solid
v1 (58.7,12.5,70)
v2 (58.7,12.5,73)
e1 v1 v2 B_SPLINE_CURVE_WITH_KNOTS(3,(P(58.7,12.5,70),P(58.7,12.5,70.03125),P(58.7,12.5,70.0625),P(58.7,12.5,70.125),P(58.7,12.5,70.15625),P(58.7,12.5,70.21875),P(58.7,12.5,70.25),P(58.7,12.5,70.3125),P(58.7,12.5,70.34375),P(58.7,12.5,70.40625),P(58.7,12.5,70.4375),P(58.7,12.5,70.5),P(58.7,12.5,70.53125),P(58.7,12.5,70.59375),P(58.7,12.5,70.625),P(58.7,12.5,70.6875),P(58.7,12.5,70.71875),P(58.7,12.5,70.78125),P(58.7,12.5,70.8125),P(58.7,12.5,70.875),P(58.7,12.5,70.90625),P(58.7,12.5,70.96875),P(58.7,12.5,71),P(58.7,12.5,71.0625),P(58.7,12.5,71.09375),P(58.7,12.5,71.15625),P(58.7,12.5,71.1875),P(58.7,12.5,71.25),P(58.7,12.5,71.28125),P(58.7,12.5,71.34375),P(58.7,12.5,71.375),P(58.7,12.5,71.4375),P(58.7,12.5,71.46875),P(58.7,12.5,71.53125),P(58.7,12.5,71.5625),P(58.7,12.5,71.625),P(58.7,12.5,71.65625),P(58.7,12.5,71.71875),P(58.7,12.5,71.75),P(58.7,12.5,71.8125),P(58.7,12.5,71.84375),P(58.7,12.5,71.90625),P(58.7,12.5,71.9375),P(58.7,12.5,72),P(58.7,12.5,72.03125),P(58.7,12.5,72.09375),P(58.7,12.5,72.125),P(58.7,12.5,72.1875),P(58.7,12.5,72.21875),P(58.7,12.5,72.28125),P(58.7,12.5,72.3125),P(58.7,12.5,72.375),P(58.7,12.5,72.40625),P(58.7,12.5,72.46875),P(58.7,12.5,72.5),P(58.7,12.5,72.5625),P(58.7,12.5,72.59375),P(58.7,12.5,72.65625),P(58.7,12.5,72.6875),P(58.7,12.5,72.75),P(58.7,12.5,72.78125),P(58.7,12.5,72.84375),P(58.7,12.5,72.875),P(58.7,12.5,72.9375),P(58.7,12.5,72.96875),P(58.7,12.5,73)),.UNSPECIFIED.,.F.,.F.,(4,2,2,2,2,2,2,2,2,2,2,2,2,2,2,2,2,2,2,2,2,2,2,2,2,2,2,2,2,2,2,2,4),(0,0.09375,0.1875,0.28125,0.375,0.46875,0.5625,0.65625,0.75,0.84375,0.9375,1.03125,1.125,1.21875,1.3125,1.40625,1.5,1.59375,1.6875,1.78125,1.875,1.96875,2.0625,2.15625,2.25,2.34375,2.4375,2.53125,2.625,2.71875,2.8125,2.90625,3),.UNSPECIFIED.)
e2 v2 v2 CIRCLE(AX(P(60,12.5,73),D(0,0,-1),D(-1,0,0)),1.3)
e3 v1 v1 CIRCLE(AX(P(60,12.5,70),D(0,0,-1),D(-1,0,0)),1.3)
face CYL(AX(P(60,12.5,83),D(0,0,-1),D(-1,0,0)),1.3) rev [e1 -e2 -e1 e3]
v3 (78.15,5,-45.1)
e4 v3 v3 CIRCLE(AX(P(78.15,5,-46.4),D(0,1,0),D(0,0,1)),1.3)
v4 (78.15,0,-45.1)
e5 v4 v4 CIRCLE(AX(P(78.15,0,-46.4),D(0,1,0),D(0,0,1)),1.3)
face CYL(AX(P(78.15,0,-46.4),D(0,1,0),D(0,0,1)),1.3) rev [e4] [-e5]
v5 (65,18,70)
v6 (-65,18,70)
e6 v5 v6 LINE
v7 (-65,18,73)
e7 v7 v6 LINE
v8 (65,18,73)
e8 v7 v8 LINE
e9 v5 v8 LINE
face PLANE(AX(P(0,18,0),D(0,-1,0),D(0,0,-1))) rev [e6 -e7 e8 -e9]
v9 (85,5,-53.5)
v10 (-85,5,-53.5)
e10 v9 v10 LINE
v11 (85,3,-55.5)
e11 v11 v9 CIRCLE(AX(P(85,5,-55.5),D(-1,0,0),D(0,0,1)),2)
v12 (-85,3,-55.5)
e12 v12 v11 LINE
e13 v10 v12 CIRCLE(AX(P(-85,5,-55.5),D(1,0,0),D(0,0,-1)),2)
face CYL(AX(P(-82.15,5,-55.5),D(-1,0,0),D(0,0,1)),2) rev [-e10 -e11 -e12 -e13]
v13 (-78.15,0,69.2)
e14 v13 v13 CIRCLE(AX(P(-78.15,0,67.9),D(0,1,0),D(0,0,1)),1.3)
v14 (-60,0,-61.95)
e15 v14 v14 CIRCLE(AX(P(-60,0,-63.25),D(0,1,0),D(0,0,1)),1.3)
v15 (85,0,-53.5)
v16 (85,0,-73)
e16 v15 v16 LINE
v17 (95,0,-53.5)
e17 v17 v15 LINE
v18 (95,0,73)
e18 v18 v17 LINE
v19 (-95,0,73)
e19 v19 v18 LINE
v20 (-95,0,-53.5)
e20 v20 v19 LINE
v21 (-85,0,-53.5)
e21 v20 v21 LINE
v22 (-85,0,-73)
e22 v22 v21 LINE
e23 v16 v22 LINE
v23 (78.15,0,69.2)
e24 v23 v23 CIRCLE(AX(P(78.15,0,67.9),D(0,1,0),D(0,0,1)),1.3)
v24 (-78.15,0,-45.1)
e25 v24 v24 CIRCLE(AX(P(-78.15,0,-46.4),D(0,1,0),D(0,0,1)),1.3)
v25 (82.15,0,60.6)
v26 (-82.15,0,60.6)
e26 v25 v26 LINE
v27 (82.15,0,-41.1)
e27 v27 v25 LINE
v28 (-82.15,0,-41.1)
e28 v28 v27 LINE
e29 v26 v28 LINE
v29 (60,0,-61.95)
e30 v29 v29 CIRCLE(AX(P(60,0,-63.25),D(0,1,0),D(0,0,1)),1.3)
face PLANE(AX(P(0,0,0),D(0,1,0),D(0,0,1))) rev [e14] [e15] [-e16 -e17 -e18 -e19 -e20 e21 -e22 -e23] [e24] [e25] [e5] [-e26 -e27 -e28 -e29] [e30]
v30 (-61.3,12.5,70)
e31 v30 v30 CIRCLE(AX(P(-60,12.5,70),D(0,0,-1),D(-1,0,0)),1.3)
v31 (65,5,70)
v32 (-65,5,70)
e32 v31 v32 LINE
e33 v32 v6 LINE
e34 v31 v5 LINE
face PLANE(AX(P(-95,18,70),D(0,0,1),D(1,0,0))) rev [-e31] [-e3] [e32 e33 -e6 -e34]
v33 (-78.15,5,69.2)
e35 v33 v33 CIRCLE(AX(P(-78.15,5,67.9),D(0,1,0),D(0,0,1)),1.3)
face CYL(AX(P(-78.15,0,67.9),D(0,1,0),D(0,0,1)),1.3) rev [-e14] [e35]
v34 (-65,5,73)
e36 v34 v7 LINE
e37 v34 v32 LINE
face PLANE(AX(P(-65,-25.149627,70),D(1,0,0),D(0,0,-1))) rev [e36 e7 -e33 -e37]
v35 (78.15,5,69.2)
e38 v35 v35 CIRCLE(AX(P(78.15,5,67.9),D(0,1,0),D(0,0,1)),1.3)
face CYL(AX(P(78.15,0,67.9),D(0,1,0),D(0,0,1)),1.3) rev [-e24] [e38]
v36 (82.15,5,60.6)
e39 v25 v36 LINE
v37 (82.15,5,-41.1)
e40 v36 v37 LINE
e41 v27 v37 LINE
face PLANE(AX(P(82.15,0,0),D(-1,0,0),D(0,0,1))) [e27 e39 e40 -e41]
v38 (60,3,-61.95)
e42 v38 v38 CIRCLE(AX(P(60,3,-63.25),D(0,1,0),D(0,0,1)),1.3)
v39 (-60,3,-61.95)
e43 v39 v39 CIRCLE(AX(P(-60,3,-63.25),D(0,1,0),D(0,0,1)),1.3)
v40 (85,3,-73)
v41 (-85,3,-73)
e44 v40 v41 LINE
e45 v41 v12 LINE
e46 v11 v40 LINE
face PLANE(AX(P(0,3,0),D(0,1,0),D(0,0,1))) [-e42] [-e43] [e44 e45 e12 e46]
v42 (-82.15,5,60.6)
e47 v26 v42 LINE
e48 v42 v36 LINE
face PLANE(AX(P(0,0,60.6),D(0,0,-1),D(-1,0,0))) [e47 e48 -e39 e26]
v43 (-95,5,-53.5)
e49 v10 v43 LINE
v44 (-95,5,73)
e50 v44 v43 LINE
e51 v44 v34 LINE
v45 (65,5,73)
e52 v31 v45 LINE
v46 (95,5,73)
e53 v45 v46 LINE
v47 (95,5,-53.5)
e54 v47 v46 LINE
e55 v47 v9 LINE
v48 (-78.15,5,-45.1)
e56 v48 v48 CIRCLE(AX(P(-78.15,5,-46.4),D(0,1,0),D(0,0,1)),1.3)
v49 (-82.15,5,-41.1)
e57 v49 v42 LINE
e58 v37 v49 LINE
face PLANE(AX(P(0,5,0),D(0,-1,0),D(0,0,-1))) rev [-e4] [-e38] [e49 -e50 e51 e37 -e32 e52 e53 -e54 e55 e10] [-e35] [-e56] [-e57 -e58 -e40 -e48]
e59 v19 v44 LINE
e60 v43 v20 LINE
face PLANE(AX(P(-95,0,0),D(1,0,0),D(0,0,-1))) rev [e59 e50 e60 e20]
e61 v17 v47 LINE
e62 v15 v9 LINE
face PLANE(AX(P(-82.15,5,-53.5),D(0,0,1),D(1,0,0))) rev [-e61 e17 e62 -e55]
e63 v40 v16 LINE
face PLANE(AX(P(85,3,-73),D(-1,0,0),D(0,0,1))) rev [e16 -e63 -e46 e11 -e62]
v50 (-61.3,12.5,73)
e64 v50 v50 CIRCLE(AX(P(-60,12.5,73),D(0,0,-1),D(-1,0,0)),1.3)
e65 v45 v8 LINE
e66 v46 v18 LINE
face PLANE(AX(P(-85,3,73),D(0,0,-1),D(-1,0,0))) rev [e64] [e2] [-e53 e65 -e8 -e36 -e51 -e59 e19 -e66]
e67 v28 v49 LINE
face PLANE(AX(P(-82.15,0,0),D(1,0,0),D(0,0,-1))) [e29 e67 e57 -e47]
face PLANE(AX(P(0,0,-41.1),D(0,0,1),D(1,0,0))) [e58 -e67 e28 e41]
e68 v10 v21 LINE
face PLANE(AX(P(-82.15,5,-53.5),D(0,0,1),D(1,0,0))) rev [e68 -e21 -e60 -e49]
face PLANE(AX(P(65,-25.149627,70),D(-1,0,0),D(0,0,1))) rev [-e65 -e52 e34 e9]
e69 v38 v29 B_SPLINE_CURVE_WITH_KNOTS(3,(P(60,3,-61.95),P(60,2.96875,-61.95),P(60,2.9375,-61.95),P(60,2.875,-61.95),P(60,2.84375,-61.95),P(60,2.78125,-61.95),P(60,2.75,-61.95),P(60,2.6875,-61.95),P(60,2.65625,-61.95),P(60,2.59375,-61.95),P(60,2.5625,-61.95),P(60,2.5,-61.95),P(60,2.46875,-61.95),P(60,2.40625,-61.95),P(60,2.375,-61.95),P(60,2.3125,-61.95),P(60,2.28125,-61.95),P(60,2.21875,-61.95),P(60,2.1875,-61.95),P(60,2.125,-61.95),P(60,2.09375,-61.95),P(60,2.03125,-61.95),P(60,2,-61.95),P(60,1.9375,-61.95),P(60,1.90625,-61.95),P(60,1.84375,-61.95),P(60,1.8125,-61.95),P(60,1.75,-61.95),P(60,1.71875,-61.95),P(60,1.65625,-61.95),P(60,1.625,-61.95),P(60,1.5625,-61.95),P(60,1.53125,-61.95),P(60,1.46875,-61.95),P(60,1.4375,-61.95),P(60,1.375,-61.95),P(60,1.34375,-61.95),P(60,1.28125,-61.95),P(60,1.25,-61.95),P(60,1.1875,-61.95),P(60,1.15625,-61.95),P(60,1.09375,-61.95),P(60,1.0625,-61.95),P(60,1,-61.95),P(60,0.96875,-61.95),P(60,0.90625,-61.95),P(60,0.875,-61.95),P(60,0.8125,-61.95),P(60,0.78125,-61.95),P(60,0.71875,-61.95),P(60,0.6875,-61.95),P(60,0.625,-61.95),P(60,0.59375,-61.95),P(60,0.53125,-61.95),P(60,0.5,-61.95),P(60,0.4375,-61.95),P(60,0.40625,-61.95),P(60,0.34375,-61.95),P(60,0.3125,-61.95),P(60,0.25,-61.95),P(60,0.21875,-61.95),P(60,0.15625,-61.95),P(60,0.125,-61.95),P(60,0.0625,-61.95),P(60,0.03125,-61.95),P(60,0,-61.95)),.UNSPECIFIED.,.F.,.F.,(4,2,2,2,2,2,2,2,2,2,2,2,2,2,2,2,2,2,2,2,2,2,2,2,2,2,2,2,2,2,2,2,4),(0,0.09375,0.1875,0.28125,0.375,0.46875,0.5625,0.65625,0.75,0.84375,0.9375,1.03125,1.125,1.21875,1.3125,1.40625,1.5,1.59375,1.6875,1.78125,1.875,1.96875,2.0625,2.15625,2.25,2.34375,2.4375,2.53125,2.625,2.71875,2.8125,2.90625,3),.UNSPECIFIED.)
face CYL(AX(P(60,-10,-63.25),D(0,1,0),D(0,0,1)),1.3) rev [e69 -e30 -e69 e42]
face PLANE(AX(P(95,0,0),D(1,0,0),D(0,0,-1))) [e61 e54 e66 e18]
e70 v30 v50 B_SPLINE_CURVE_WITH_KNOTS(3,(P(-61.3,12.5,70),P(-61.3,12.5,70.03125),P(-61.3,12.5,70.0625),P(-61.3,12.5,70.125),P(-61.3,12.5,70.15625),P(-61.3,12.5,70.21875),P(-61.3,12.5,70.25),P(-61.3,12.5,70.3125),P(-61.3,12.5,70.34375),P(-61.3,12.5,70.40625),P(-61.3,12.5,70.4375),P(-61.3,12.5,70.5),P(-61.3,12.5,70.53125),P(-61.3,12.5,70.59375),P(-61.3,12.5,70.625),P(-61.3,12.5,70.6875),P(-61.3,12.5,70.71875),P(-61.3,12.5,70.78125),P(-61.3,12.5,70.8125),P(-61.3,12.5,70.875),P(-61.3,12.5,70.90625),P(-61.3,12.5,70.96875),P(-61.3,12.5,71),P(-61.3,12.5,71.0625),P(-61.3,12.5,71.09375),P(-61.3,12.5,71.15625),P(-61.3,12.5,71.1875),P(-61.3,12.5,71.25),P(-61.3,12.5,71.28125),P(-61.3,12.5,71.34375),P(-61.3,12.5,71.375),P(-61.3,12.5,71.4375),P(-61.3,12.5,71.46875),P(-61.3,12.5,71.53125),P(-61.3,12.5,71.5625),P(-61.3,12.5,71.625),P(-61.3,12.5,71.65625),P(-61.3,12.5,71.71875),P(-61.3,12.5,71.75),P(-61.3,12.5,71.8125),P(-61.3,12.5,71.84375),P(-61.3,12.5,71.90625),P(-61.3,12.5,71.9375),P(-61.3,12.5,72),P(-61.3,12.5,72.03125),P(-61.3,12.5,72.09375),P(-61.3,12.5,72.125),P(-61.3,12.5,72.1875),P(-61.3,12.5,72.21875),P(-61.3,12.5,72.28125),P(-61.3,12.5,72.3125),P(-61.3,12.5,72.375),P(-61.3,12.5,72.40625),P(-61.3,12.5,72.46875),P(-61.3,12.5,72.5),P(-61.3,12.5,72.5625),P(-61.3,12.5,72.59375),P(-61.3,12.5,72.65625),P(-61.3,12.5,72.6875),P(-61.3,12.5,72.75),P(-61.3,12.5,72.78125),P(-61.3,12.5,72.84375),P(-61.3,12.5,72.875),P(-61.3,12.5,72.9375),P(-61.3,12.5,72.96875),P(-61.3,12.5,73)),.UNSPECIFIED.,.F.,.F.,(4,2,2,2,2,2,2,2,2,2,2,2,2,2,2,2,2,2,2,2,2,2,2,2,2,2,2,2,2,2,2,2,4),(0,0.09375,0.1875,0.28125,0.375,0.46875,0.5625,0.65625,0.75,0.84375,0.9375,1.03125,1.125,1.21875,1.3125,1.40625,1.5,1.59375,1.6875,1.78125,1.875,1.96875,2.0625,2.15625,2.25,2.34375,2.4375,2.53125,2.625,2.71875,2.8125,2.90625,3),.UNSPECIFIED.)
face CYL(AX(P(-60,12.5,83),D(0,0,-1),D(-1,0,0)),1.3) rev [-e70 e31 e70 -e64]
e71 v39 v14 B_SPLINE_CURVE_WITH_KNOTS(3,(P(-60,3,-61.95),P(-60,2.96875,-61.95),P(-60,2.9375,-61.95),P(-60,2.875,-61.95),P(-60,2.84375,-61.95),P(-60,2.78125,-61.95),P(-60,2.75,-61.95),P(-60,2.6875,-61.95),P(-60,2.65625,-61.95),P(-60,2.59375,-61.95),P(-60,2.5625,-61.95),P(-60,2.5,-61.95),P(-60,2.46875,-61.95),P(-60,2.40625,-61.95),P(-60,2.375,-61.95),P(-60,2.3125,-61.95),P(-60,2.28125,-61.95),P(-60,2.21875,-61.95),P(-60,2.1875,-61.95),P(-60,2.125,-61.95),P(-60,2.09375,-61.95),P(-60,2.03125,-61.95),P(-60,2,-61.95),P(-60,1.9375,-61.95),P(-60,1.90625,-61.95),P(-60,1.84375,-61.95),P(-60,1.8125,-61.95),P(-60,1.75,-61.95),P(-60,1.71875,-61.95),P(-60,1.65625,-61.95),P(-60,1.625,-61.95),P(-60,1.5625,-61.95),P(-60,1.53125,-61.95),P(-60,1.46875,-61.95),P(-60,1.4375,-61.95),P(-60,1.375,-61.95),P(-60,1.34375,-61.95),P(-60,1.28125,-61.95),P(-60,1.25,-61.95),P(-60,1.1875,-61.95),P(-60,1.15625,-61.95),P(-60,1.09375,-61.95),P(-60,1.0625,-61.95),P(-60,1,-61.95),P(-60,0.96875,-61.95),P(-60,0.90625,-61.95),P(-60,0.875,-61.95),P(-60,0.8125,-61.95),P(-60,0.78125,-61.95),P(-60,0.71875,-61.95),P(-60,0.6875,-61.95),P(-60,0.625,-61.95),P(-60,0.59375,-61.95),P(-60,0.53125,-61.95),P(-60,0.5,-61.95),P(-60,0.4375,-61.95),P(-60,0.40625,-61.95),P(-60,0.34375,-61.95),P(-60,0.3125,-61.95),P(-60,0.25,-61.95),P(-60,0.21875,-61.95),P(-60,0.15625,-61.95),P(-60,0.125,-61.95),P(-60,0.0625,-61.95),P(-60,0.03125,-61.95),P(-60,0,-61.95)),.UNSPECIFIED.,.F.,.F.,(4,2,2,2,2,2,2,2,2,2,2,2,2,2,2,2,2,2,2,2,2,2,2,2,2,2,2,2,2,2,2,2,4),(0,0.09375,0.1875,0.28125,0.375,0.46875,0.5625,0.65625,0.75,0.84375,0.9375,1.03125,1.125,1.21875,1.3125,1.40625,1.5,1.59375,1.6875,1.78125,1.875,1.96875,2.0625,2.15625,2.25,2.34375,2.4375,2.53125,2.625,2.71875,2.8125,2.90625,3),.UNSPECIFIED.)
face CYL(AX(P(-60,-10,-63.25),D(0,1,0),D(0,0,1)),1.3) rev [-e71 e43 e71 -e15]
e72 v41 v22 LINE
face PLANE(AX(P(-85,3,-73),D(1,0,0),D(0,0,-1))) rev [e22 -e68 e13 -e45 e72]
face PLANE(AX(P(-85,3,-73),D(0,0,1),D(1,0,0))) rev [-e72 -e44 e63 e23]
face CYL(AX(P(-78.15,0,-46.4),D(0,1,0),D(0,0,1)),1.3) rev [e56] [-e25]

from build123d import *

# Parameters (mm, degrees)
SKETCH1_W           = 170
SKETCH1_H           = 146
BOSS_EXTRUDE1_DEPTH = 3
SKETCH2_R           = 1.3
CUT_EXTRUDE1_DEPTH  = 3
CUT_EXTRUDE2_DEPTH  = 3
BOSS_EXTRUDE2_START = 2
SKETCH4_R           = 1.3
SKETCH4_W           = 164.3
SKETCH4_H           = 101.7
BOSS_EXTRUDE2_DEPTH = 2
BOSS_EXTRUDE5_DEPTH = 10
SKETCH10_W          = 126.5
SKETCH10_H          = 5
BOSS_EXTRUDE6_DEPTH = 10
SKETCH12_W          = 190
SKETCH12_H          = 3
BOSS_EXTRUDE8_DEPTH = 13
SKETCH13_R          = 1.3
CUT_EXTRUDE3_DEPTH  = 13
FILLET4_R           = 2
SKETCH14_R          = 1.3
CUT_EXTRUDE4_DEPTH  = 13
SKETCH15_W          = 30
SKETCH15_H          = 3
CUT_EXTRUDE5_DEPTH  = 13


with BuildPart() as part:
    # Sketch1 → Boss-Extrude1 (new body)
    with BuildSketch(Plane(origin=(0, 0, 0), x_dir=(1, 0, 0), z_dir=(0, 1, 0))):
        Rectangle(SKETCH1_W, SKETCH1_H)
    extrude(amount=BOSS_EXTRUDE1_DEPTH)

    # Sketch2 → Cut-Extrude1 (cut)
    with BuildSketch(Plane(origin=(0, 3, 0), x_dir=(1, 0, 0), z_dir=(0, 1, 0))):
        with Locations(Location((78.15, -67.9, 0), (0, 0, 270))):
            Circle(SKETCH2_R)
        with Locations(Location((-78.15, 46.4, 0), (0, 0, 270))):
            Circle(SKETCH2_R)
        with Locations(Location((-78.15, -67.9, 0), (0, 0, 270))):
            Circle(SKETCH2_R)
        with Locations(Location((78.15, 46.4, 0), (0, 0, 270))):
            Circle(SKETCH2_R)
    extrude(amount=-CUT_EXTRUDE1_DEPTH, mode=Mode.SUBTRACT)

    # Sketch3 → Cut-Extrude2 (cut)
    with BuildSketch(Plane(origin=(0, 3, 0), x_dir=(1, 0, 0), z_dir=(0, 1, 0))):
        Polygon((-78.15, -60.6), (-82.15, -60.6), (-82.15, 41.1), (-78.15, 41.1), (78.15, 41.1), (82.15, 41.1), (82.15, -60.6), (78.15, -60.6), align=None)
    extrude(amount=-CUT_EXTRUDE2_DEPTH, mode=Mode.SUBTRACT)

    # Sketch4 → Boss-Extrude2 (add)
    with BuildSketch(Plane(origin=(0, 3, 0), x_dir=(1, 0, 0), z_dir=(0, 1, 0)).offset(BOSS_EXTRUDE2_START)):
        Polygon((-82.15, 53.5), (85, 53.5), (85, -73), (-85, -73), (-85, 53.5), align=None)
        with Locations(Location((-78.15, 46.4, 0), (0, 0, 270))):
            Circle(SKETCH4_R, mode=Mode.SUBTRACT)
        with Locations(Location((-78.15, -67.9, 0), (0, 0, 270))):
            Circle(SKETCH4_R, mode=Mode.SUBTRACT)
        with Locations(Location((78.15, -67.9, 0), (0, 0, 270))):
            Circle(SKETCH4_R, mode=Mode.SUBTRACT)
        with Locations(Location((78.15, 46.4, 0), (0, 0, 270))):
            Circle(SKETCH4_R, mode=Mode.SUBTRACT)
        with Locations((0, -9.75)):
            Rectangle(SKETCH4_W, SKETCH4_H, mode=Mode.SUBTRACT)
    extrude(amount=-BOSS_EXTRUDE2_DEPTH)

    # Sketch9 → Boss-Extrude5 (add)
    with BuildSketch(Plane.ZY.offset(85)):
        Polygon((-53.5, 3), (-53.5, 5), (73, 5), (73, 0), (-53.5, 0), align=None)
    extrude(amount=BOSS_EXTRUDE5_DEPTH)

    # Sketch10 → Boss-Extrude6 (add)
    with BuildSketch(Plane(origin=(85, 0, 0), x_dir=(0, 0, -1), z_dir=(1, 0, 0))):
        with Locations((-9.75, 2.5)):
            Rectangle(SKETCH10_W, SKETCH10_H)
    extrude(amount=BOSS_EXTRUDE6_DEPTH)

    # Sketch12 → Boss-Extrude8 (add)
    with BuildSketch(Plane(origin=(0, 5, 0), x_dir=(1, 0, 0), z_dir=(0, 1, 0))):
        with Locations((0, -71.5)):
            Rectangle(SKETCH12_W, SKETCH12_H)
    extrude(amount=BOSS_EXTRUDE8_DEPTH)

    # Sketch13 → Cut-Extrude3 (cut)
    with BuildSketch(Plane(origin=(0, 3, 0), x_dir=(1, 0, 0), z_dir=(0, 1, 0))):
        with Locations(Location((-60, 63.25, 0), (0, 0, 270))):
            Circle(SKETCH13_R)
        with Locations(Location((60, 63.25, 0), (0, 0, 270))):
            Circle(SKETCH13_R)
    extrude(amount=-CUT_EXTRUDE3_DEPTH, mode=Mode.SUBTRACT)

    # Fillet4
    fillet4_edges = [part.edges().sort_by_distance(p)[0] for p in [
        (0, 3, -53.5),
    ]]
    fillet(fillet4_edges, radius=FILLET4_R - 0.0001)  # a hair under: the kernel refuses the full size

    # Sketch14 → Cut-Extrude4 (cut)
    with BuildSketch(Plane(origin=(0, 0, 70), x_dir=(-1, 0, 0), z_dir=(0, 0, -1))):
        with Locations((-60, 12.5)):
            Circle(SKETCH14_R)
        with Locations((60, 12.5)):
            Circle(SKETCH14_R)
    extrude(amount=-CUT_EXTRUDE4_DEPTH, mode=Mode.SUBTRACT)

    # Sketch15 → Cut-Extrude5 (cut)
    with BuildSketch(Plane(origin=(0, 18, 0), x_dir=(1, 0, 0), z_dir=(0, 1, 0))):
        with Locations((80, -71.5)):
            Rectangle(SKETCH15_W, SKETCH15_H)
        with Locations((-80, -71.5)):
            Rectangle(SKETCH15_W, SKETCH15_H)
    extrude(amount=-CUT_EXTRUDE5_DEPTH, mode=Mode.SUBTRACT)


solid = part.part
